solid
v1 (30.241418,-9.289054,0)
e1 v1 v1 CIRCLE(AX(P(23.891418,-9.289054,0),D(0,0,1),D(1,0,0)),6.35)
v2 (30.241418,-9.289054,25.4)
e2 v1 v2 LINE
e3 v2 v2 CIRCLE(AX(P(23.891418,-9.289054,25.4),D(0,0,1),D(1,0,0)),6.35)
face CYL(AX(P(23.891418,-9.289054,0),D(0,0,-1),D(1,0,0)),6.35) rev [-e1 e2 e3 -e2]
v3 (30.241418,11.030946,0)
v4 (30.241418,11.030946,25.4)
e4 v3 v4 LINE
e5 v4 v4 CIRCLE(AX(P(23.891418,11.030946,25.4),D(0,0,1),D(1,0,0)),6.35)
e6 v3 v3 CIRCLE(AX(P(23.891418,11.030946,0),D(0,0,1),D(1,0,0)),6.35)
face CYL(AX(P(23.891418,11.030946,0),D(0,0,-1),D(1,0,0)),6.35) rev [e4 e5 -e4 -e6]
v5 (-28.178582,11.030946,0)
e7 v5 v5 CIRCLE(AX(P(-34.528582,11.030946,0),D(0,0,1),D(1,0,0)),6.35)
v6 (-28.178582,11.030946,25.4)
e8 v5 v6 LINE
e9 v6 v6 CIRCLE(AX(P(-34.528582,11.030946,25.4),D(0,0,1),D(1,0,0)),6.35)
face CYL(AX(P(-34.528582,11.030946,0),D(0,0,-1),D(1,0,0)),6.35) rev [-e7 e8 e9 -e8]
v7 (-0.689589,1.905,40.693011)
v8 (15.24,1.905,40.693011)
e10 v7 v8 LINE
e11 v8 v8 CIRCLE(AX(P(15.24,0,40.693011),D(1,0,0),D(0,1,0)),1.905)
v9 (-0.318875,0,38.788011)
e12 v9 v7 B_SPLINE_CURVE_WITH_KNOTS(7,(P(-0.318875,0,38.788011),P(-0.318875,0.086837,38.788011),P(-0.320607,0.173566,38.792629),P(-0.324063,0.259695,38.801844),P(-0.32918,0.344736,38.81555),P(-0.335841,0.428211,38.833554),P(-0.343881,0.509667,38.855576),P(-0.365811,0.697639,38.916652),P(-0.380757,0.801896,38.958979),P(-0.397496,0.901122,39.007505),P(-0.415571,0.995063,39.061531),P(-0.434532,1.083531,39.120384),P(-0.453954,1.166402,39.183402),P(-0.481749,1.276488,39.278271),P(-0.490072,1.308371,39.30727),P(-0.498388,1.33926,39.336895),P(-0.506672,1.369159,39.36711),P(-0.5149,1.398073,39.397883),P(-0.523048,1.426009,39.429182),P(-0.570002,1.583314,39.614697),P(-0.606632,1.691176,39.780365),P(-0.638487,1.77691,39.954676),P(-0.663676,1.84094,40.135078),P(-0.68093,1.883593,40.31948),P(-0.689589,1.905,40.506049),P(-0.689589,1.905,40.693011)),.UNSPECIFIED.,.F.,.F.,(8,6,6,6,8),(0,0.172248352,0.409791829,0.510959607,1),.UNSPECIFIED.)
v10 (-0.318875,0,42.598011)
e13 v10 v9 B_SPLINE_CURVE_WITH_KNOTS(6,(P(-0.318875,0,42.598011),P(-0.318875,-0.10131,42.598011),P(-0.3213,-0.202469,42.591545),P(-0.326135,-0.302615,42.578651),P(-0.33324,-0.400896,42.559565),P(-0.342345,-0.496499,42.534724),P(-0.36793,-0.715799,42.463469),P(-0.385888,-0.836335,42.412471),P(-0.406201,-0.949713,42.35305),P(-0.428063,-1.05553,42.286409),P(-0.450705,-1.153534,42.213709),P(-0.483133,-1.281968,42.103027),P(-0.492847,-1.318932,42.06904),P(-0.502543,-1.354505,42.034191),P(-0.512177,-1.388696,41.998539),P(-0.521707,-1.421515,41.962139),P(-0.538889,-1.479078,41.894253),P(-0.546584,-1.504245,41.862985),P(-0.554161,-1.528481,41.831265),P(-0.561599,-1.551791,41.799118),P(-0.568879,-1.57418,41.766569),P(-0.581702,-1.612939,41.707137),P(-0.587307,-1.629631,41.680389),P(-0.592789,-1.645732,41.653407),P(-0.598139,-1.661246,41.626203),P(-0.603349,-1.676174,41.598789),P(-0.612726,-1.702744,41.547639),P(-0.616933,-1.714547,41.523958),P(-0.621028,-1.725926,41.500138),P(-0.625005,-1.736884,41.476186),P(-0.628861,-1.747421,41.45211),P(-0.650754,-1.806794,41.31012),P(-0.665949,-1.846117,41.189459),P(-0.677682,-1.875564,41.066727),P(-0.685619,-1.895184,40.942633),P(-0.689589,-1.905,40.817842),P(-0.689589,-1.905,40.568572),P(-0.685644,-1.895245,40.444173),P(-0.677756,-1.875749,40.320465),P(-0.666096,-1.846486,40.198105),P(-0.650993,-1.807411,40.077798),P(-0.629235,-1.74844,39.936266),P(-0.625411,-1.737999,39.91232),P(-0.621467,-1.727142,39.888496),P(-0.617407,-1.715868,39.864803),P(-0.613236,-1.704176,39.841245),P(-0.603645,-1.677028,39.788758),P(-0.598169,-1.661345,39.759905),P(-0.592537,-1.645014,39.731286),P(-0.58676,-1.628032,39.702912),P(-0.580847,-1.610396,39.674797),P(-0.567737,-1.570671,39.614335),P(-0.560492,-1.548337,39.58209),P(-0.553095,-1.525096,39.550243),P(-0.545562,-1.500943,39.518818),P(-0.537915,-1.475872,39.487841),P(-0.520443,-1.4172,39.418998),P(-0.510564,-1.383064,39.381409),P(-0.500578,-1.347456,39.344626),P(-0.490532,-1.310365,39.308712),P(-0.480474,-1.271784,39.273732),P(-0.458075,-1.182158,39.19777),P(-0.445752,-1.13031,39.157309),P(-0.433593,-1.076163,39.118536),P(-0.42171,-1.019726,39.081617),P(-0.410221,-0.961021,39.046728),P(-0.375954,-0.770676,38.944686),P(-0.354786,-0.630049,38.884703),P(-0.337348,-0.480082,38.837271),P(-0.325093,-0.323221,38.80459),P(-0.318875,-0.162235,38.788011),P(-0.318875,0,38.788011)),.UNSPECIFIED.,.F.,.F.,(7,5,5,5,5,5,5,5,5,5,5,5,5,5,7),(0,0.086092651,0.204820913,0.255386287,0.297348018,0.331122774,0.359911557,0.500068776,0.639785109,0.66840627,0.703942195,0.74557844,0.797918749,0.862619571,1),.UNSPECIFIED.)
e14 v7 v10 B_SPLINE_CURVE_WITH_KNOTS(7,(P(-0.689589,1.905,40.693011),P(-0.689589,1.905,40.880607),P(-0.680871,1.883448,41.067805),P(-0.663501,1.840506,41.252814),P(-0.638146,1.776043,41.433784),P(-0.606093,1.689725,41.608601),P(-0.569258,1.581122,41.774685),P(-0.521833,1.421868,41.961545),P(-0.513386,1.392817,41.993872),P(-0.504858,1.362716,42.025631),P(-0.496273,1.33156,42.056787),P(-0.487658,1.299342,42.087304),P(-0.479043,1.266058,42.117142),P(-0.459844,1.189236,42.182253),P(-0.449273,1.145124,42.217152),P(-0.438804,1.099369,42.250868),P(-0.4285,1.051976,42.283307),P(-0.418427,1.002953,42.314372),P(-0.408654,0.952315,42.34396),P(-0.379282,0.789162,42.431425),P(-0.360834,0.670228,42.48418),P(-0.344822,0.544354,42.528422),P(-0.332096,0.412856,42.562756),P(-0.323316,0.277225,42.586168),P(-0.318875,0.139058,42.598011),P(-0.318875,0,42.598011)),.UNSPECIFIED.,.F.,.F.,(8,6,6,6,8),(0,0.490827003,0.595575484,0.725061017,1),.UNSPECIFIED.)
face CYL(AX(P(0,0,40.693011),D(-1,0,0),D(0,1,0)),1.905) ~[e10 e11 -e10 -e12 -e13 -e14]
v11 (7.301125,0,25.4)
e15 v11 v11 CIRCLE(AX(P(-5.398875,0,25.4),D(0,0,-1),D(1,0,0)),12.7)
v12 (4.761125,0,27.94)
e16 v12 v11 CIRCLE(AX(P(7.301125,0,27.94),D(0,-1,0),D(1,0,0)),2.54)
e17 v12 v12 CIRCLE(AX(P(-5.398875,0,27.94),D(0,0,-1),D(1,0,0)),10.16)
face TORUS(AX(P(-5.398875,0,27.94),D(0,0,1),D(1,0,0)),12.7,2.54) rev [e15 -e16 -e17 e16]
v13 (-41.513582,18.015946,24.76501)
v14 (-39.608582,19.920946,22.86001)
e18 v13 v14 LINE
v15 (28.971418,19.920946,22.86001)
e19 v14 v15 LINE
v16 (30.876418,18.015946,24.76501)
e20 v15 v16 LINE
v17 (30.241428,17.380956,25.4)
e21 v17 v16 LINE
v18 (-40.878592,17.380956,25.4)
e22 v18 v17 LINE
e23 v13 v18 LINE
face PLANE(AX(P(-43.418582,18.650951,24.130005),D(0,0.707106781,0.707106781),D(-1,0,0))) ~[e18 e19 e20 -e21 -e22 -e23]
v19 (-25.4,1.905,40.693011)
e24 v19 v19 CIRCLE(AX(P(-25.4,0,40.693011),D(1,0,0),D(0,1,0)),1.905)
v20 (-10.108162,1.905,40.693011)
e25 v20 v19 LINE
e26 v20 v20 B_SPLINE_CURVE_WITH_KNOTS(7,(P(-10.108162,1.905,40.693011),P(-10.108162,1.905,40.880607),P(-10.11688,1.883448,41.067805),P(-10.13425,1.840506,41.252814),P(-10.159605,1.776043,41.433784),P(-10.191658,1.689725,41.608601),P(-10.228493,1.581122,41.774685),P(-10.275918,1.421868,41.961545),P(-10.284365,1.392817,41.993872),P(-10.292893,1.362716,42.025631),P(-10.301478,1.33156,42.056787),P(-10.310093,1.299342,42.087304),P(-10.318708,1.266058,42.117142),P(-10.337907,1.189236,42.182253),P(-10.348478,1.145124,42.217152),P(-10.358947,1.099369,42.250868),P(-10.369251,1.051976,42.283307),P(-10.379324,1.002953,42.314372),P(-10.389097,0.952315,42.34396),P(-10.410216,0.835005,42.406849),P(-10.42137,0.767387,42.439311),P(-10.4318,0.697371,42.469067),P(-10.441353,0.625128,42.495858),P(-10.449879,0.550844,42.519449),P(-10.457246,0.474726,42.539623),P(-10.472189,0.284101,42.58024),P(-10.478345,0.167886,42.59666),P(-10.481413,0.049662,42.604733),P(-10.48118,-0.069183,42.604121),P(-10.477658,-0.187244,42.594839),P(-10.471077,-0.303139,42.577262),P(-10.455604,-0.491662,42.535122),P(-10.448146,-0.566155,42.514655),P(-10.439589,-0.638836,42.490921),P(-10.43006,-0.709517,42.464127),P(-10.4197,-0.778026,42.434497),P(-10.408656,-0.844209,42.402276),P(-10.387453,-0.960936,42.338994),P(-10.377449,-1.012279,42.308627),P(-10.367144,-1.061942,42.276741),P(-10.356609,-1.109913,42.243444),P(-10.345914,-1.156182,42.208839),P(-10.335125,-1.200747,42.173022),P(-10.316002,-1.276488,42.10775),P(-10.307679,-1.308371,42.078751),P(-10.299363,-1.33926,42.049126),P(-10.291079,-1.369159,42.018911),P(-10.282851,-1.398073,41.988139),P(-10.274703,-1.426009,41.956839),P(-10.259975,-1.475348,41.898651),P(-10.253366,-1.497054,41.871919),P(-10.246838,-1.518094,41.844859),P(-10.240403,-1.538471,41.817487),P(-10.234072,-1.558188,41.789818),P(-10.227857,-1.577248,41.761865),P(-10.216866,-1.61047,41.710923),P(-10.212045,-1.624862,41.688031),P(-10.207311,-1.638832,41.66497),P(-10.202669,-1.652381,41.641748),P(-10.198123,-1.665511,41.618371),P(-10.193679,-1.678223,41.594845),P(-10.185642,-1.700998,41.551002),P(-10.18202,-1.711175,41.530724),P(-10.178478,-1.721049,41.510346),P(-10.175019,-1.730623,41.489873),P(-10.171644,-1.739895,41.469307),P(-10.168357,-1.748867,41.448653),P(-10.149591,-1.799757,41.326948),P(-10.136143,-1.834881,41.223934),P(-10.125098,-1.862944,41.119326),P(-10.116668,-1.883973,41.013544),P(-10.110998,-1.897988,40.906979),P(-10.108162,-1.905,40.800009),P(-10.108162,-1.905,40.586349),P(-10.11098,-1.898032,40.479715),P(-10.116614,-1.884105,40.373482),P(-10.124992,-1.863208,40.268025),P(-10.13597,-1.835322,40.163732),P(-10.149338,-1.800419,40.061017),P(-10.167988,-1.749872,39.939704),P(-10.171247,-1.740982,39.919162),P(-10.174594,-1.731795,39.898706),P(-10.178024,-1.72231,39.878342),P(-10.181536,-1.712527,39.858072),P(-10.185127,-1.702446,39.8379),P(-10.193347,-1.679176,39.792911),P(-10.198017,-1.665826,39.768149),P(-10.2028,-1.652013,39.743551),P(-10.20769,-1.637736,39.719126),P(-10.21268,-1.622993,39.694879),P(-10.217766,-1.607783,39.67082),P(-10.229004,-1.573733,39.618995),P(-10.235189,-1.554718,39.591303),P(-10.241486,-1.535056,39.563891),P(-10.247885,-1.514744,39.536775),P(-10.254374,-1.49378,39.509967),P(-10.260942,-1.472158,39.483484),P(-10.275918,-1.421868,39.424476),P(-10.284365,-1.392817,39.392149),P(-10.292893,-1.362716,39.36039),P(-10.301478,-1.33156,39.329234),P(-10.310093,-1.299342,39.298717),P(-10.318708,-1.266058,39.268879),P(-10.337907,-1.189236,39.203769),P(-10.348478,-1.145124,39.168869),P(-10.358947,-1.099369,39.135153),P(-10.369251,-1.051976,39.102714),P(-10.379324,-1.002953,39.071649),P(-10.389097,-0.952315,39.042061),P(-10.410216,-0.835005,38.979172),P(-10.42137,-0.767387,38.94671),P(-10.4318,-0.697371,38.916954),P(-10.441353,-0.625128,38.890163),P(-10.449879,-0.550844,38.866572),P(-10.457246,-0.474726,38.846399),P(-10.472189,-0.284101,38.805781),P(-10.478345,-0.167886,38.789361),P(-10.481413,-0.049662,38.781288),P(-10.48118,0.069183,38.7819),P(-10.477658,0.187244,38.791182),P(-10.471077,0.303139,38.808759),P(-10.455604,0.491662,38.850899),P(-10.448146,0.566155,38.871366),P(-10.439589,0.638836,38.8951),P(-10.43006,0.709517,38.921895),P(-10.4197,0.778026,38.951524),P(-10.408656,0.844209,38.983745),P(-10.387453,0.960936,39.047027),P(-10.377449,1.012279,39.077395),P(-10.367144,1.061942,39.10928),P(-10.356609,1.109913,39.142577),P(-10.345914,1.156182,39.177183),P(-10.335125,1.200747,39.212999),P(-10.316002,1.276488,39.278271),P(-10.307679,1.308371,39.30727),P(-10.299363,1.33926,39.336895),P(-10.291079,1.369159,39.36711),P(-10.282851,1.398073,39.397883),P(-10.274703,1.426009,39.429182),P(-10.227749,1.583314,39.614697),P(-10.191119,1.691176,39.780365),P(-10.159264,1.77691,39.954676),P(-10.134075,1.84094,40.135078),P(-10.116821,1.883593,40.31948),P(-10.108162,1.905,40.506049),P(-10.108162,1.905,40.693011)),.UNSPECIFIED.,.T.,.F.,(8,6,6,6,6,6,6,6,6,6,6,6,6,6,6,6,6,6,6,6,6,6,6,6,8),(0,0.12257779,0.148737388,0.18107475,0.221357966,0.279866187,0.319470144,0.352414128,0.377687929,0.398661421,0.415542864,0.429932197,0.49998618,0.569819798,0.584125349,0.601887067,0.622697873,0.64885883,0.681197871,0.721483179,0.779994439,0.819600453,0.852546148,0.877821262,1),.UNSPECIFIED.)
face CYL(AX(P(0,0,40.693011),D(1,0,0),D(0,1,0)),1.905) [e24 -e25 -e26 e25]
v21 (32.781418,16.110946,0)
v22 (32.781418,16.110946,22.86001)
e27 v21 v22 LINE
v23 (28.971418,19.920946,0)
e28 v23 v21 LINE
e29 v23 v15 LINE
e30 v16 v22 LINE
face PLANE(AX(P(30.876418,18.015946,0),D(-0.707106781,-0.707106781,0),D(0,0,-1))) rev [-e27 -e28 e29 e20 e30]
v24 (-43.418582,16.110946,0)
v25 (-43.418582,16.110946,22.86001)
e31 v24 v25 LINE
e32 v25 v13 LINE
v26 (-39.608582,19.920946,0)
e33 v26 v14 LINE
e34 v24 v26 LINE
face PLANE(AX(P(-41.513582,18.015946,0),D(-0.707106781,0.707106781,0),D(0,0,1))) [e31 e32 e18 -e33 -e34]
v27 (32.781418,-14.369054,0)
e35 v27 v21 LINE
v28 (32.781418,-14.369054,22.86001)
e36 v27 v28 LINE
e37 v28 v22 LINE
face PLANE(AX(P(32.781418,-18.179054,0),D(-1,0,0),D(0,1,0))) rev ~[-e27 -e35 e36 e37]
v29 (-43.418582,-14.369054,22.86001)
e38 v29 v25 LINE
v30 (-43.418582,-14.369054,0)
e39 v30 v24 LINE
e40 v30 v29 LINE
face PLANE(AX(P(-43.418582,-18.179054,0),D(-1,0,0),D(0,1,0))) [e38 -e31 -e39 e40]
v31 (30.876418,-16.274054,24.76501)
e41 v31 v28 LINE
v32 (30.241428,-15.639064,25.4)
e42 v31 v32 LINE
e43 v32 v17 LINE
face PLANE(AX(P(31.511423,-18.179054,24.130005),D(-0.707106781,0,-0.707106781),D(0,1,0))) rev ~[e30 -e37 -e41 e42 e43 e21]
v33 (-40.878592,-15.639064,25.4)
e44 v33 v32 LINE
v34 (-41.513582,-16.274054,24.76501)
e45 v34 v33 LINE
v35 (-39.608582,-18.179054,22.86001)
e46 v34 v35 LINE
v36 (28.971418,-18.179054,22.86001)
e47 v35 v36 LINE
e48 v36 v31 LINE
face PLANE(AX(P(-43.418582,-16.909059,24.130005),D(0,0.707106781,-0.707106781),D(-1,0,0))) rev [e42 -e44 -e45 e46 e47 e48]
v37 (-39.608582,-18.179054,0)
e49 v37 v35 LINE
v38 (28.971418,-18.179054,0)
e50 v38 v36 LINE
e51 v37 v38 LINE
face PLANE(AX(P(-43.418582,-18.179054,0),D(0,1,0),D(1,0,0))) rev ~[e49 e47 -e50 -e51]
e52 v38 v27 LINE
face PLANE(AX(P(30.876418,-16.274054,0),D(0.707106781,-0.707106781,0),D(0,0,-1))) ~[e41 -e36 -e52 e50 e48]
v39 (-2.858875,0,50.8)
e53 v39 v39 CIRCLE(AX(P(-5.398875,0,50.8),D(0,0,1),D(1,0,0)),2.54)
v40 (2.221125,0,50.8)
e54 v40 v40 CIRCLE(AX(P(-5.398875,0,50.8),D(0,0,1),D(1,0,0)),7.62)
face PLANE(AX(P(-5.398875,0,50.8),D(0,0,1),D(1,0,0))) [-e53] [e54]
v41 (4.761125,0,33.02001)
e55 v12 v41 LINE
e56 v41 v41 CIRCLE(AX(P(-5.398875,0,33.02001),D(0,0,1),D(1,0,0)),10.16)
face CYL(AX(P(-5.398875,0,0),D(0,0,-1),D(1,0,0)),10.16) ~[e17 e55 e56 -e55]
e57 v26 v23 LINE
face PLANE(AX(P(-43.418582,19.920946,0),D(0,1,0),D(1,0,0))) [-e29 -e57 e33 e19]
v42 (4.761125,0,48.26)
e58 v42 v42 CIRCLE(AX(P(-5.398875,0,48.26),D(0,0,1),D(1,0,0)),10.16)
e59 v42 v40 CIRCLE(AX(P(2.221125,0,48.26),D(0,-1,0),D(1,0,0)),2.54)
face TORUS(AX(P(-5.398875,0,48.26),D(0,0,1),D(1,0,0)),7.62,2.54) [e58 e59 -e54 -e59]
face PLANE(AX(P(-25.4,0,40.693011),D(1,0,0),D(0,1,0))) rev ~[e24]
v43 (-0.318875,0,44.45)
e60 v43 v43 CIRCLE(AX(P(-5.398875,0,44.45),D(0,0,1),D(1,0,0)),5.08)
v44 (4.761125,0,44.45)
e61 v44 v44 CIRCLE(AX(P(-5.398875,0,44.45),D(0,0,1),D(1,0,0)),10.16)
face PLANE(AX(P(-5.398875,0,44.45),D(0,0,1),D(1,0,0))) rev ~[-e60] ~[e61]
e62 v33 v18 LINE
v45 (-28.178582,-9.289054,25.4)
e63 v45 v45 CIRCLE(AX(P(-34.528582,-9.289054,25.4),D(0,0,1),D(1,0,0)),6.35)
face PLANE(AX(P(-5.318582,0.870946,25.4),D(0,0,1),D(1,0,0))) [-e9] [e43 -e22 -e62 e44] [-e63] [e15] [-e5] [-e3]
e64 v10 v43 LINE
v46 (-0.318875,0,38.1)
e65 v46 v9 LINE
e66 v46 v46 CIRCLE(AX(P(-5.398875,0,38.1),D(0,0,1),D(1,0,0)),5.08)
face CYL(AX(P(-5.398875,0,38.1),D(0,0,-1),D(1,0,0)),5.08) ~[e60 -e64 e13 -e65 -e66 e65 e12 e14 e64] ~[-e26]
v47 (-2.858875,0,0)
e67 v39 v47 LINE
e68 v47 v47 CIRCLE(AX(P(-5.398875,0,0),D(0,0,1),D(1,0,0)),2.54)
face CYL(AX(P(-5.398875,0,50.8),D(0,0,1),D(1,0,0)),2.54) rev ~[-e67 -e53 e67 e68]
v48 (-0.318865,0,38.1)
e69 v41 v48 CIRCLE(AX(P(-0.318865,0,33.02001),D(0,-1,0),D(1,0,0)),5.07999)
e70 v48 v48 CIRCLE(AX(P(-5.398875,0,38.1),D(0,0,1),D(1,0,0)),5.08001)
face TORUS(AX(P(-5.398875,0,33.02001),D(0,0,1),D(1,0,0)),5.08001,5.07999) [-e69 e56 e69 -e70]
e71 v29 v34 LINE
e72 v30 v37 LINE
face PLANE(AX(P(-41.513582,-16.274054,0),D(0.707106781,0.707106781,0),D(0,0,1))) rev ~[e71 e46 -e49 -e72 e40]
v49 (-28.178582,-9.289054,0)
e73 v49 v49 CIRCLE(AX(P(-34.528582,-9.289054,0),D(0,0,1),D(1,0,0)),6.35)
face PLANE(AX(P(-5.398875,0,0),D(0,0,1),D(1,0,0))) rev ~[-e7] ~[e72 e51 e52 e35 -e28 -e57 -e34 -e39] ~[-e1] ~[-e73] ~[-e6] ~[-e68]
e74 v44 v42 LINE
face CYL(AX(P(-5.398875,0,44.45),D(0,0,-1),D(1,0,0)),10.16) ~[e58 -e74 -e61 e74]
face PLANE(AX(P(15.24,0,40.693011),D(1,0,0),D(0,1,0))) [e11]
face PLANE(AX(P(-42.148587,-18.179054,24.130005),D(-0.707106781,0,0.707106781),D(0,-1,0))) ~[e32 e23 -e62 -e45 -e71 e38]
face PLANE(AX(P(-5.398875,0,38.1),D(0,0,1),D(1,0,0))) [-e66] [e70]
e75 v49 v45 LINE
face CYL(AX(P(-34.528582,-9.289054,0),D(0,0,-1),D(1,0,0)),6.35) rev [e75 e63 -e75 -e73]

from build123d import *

# Parameters (mm, degrees)
F0_W      = 76.2
F0_H      = 38.1
F1_DEPTH  = 25.4
F2_R      = 6.35
F1_FACE_W = 76.2
F1_FACE_H = 38.1
F3_DEPTH  = 25.4
F4_SIZE   = 2.53999
F5_R      = 10.16
F6_DEPTH  = 38.1
F7_R      = 5.08
F8_DEPTH  = 6.35
F9_R      = 10.16
F10_DEPTH = 6.35
F11_R     = 1.905
F12_DEPTH = 25.4
F13_DEPTH = 15.24
F14_R     = 2.54
F15_R     = 2.54
F16_R     = 2.54
F17_DEPTH = 50.8
F18_SIZE  = 3.81
F19_R     = 5.07999


# Not quite as in the source:
# - a fillet or chamfer is up to 0.001 mm smaller than in the source, because OpenCascade refuses the exact size


with BuildPart() as f1:
    # F0 (on Top) → F1 (new body)
    with BuildSketch(Plane.XY):
        with Locations((-5.318582058, 0.8709464072)):
            Rectangle(F0_W, F0_H)
    extrude(amount=F1_DEPTH)

    # F2 (on Top) + F1_face (on face) → F3 (cut)
    with BuildSketch(Plane.XY):
        with Locations((-34.528582058, -9.2890535928)):
            Circle(F2_R)
        with Locations((23.891417942, 11.0309464072)):
            Circle(F2_R)
        with Locations((23.891417942, -9.2890535928)):
            Circle(F2_R)
        with Locations((-34.528582058, 11.0309464072)):
            Circle(F2_R)
    with BuildSketch(Plane(origin=(-5.318582058, 0.8709464072, 25.4), x_dir=(1, 0, 0), z_dir=(0, 0, 1))):
        Rectangle(F1_FACE_W, F1_FACE_H)
    extrude(amount=F3_DEPTH, mode=Mode.SUBTRACT)

    # F4 (size 2.54 in the source; OpenCascade refuses exactly that, so slightly less here)
    f4_edges = [f1.edges().sort_by_distance(p)[0] for p in [
        (-5.318582, -18.179054, 25.4),
        (32.781418, 0.870946, 25.4),
        (-5.318582, 19.920946, 25.4),
        (-43.418582, 0.870946, 25.4),
    ]]
    chamfer(f4_edges, length=F4_SIZE)

    # F5 (on Top) → F6 (join)
    with BuildSketch(Plane.XY):
        with Locations((-5.3988754862, 0)):
            Circle(F5_R)
    extrude(amount=F6_DEPTH)

    # F7 (on face) → F8 (join)
    with BuildSketch(Plane.XY.offset(38.1)):
        with Locations((-5.3988754862, 0)):
            Circle(F7_R)
    extrude(amount=F8_DEPTH)

    # F9 (on face) → F10 (join)
    with BuildSketch(Plane.XY.offset(44.45)):
        with Locations((-5.3988754862, 0)):
            Circle(F9_R)
    extrude(amount=F10_DEPTH)

    # F11 (on Right) → F12 (join)
    with BuildSketch(Plane.YZ):
        with Locations((0, 40.6930105954)):
            Circle(F11_R)
    extrude(amount=-F12_DEPTH)

    # F11 (on Right) → F13 (join)
    with BuildSketch(Plane.YZ):
        with Locations((0, 40.6930105954)):
            Circle(F11_R)
    extrude(amount=F13_DEPTH)

    # F14
    f14_edges = [f1.edges().sort_by_distance(p)[0] for p in [
        (-15.558875, 0, 25.4),
    ]]
    fillet(f14_edges, radius=F14_R)

    # F15
    f15_edges = [f1.edges().sort_by_distance(p)[0] for p in [
        (-15.558875, 0, 50.8),
    ]]
    fillet(f15_edges, radius=F15_R)

    # F16 (on face) → F17 (cut)
    with BuildSketch(Plane.XY.offset(50.8)):
        with Locations((-5.3988754862, 0)):
            Circle(F16_R)
    extrude(amount=-F17_DEPTH, mode=Mode.SUBTRACT)

    # F18
    f18_edges = [f1.edges().sort_by_distance(p)[0] for p in [
        (32.781418, -18.179054, 11.430005),
        (-43.418582, -18.179054, 11.430005),
        (32.781418, 19.920946, 11.430005),
        (-43.418582, 19.920946, 11.430005),
    ]]
    chamfer(f18_edges, length=F18_SIZE)

    # F19 (radius 5.08 in the source; OpenCascade refuses exactly that, so slightly less here)
    f19_edges = [f1.edges().sort_by_distance(p)[0] for p in [
        (-15.558875, 0, 38.1),
    ]]
    fillet(f19_edges, radius=F19_R)


solid = f1.part
